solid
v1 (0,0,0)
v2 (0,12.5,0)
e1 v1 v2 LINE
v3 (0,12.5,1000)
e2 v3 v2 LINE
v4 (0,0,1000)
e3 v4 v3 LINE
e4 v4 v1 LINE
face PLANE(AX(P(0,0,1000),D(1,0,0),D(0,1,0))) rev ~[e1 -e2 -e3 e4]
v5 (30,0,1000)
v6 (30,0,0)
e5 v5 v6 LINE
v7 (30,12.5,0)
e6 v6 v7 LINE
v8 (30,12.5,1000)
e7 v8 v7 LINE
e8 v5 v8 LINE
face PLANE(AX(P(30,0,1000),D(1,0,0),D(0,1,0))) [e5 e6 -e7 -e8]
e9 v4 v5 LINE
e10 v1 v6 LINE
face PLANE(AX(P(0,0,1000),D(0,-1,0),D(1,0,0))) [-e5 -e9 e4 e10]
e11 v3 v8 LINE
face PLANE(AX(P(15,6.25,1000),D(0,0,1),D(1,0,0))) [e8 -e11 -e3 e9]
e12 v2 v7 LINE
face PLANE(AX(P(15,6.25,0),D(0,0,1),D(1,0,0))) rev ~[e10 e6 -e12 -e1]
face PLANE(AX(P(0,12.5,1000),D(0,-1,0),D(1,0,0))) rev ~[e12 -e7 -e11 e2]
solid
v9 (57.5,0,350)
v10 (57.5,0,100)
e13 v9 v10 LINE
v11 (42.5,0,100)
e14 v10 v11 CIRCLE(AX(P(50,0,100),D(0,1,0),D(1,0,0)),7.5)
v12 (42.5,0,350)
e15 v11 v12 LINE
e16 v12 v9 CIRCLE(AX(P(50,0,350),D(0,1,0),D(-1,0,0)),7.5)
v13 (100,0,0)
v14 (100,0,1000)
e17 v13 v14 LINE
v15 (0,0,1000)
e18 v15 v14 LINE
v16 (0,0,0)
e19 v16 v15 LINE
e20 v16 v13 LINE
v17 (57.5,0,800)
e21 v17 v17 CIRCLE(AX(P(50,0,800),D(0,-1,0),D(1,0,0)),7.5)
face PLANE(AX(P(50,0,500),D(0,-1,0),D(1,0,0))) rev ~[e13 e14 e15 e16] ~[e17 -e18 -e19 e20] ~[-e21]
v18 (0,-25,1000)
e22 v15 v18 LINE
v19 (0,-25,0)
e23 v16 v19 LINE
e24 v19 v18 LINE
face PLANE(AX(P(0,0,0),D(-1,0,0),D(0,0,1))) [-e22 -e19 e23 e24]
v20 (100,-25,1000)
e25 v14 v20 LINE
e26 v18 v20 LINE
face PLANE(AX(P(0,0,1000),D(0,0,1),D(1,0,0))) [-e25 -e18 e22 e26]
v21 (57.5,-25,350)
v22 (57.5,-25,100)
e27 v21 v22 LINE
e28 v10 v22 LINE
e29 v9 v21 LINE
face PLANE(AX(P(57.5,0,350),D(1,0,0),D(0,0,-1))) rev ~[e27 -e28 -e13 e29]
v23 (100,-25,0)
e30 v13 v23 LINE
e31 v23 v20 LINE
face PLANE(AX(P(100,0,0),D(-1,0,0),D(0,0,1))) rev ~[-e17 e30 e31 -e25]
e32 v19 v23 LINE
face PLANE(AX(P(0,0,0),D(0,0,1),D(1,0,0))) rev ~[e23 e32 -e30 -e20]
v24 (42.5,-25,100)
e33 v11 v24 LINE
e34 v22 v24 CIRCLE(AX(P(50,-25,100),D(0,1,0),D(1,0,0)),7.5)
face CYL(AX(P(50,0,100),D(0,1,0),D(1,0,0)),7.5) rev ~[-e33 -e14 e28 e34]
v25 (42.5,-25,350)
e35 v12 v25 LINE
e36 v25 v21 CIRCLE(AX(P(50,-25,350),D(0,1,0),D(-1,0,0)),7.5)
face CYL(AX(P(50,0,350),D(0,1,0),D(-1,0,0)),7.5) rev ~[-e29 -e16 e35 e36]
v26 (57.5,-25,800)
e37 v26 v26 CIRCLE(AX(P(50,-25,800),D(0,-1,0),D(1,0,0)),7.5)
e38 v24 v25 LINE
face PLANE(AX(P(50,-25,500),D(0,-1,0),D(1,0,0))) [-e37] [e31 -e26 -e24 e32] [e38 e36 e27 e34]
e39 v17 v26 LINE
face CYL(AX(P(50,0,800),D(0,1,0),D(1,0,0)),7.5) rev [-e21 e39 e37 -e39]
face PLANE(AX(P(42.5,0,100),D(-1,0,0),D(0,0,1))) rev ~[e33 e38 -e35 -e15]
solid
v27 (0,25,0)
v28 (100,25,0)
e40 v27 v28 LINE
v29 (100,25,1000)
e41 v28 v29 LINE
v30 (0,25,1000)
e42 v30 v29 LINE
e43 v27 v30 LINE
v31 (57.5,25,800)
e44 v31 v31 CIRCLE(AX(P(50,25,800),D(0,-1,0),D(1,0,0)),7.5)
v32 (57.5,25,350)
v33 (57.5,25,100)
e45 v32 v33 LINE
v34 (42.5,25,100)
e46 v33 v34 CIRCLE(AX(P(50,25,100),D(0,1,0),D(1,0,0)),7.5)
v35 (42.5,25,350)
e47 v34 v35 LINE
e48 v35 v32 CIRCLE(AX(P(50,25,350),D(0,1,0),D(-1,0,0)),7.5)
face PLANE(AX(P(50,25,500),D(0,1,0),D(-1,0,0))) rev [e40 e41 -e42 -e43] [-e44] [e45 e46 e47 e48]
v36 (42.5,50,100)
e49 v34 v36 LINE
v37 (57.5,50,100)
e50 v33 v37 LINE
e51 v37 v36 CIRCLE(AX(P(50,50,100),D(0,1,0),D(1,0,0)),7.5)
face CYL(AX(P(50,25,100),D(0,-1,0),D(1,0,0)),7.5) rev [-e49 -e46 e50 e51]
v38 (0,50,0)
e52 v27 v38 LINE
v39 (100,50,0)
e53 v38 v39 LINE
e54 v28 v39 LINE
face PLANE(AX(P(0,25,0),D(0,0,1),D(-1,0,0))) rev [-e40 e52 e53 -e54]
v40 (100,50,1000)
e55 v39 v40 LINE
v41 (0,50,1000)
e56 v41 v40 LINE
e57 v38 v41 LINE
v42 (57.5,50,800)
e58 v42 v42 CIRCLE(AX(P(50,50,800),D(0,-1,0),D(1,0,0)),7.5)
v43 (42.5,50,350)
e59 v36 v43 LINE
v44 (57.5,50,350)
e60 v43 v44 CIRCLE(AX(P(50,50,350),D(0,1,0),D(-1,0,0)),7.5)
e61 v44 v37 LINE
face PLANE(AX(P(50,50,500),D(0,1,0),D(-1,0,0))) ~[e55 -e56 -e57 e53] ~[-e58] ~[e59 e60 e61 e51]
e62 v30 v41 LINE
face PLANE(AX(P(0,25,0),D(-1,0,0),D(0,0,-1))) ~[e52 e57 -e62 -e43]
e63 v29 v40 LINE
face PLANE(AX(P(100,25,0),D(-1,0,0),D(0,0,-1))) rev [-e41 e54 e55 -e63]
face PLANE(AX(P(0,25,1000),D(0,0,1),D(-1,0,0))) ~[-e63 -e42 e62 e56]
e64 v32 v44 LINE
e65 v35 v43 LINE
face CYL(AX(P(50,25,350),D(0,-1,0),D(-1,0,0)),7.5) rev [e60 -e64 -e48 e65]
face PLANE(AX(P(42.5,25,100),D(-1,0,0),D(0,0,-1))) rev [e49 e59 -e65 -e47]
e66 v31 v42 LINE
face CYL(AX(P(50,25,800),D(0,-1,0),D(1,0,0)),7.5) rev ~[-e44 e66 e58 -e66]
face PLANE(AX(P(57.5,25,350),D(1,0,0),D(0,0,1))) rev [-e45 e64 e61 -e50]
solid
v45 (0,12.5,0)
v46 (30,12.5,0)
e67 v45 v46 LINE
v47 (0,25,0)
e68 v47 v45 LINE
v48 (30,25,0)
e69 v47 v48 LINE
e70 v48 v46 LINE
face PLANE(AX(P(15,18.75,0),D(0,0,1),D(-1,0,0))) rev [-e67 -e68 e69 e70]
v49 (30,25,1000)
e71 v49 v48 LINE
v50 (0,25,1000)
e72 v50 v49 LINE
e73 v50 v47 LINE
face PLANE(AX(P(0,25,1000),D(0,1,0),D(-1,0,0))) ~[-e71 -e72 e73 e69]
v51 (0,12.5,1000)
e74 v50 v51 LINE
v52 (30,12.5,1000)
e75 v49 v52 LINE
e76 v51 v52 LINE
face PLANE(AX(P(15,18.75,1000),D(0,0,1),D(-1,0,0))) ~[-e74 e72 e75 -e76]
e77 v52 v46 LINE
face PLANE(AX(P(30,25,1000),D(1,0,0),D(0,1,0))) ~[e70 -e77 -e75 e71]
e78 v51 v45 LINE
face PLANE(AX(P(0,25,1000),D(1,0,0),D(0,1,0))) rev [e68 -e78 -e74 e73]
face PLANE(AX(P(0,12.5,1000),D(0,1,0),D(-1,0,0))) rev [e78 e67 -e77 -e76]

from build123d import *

# Parameters (mm, degrees)
F0_W     = 100
F0_H     = 1000
F0_R     = 7.5
F1_DEPTH = 25
F2_W     = 30
F2_H     = 12.5
F3_DEPTH = 1000


# Not quite as in the source:
# - a feature names something its author has since deleted; it is built from what else it names


with BuildPart() as f1:
    # F0 (on Front) → F1 (new body)
    with BuildSketch(Plane.XZ):
        with Locations((50, 500)):
            Rectangle(F0_W, F0_H)
        with BuildLine():
            Line((57.5, 350), (57.5, 100))
            ThreePointArc((57.5, 100), (50, 92.5), (42.5, 100))
            Line((42.5, 100), (42.5, 350))
            ThreePointArc((42.5, 350), (50, 357.5), (57.5, 350))
        make_face(mode=Mode.SUBTRACT)
        with Locations((50, 800)):
            Circle(F0_R, mode=Mode.SUBTRACT)
    extrude(amount=F1_DEPTH)


with BuildPart() as f3:
    # F2 (on face) → F3 (new body, through all)
    with BuildSketch(Plane.XY.offset(1000)):
        with Locations((15, 6.25)):
            Rectangle(F2_W, F2_H)
    extrude(amount=-F3_DEPTH)


with BuildPart() as f4_1:
    # F4: instance of F1
    add(f1.part.mirror(Plane(origin=(15, 12.5, 500), x_dir=(-1, 0, 0), z_dir=(0, 1, 0))))


with BuildPart() as f4_2:
    # F4: instance of F3
    add(f3.part.mirror(Plane(origin=(15, 12.5, 500), x_dir=(-1, 0, 0), z_dir=(0, 1, 0))))


solid = Compound([f1.part, f3.part, f4_1.part, f4_2.part])
